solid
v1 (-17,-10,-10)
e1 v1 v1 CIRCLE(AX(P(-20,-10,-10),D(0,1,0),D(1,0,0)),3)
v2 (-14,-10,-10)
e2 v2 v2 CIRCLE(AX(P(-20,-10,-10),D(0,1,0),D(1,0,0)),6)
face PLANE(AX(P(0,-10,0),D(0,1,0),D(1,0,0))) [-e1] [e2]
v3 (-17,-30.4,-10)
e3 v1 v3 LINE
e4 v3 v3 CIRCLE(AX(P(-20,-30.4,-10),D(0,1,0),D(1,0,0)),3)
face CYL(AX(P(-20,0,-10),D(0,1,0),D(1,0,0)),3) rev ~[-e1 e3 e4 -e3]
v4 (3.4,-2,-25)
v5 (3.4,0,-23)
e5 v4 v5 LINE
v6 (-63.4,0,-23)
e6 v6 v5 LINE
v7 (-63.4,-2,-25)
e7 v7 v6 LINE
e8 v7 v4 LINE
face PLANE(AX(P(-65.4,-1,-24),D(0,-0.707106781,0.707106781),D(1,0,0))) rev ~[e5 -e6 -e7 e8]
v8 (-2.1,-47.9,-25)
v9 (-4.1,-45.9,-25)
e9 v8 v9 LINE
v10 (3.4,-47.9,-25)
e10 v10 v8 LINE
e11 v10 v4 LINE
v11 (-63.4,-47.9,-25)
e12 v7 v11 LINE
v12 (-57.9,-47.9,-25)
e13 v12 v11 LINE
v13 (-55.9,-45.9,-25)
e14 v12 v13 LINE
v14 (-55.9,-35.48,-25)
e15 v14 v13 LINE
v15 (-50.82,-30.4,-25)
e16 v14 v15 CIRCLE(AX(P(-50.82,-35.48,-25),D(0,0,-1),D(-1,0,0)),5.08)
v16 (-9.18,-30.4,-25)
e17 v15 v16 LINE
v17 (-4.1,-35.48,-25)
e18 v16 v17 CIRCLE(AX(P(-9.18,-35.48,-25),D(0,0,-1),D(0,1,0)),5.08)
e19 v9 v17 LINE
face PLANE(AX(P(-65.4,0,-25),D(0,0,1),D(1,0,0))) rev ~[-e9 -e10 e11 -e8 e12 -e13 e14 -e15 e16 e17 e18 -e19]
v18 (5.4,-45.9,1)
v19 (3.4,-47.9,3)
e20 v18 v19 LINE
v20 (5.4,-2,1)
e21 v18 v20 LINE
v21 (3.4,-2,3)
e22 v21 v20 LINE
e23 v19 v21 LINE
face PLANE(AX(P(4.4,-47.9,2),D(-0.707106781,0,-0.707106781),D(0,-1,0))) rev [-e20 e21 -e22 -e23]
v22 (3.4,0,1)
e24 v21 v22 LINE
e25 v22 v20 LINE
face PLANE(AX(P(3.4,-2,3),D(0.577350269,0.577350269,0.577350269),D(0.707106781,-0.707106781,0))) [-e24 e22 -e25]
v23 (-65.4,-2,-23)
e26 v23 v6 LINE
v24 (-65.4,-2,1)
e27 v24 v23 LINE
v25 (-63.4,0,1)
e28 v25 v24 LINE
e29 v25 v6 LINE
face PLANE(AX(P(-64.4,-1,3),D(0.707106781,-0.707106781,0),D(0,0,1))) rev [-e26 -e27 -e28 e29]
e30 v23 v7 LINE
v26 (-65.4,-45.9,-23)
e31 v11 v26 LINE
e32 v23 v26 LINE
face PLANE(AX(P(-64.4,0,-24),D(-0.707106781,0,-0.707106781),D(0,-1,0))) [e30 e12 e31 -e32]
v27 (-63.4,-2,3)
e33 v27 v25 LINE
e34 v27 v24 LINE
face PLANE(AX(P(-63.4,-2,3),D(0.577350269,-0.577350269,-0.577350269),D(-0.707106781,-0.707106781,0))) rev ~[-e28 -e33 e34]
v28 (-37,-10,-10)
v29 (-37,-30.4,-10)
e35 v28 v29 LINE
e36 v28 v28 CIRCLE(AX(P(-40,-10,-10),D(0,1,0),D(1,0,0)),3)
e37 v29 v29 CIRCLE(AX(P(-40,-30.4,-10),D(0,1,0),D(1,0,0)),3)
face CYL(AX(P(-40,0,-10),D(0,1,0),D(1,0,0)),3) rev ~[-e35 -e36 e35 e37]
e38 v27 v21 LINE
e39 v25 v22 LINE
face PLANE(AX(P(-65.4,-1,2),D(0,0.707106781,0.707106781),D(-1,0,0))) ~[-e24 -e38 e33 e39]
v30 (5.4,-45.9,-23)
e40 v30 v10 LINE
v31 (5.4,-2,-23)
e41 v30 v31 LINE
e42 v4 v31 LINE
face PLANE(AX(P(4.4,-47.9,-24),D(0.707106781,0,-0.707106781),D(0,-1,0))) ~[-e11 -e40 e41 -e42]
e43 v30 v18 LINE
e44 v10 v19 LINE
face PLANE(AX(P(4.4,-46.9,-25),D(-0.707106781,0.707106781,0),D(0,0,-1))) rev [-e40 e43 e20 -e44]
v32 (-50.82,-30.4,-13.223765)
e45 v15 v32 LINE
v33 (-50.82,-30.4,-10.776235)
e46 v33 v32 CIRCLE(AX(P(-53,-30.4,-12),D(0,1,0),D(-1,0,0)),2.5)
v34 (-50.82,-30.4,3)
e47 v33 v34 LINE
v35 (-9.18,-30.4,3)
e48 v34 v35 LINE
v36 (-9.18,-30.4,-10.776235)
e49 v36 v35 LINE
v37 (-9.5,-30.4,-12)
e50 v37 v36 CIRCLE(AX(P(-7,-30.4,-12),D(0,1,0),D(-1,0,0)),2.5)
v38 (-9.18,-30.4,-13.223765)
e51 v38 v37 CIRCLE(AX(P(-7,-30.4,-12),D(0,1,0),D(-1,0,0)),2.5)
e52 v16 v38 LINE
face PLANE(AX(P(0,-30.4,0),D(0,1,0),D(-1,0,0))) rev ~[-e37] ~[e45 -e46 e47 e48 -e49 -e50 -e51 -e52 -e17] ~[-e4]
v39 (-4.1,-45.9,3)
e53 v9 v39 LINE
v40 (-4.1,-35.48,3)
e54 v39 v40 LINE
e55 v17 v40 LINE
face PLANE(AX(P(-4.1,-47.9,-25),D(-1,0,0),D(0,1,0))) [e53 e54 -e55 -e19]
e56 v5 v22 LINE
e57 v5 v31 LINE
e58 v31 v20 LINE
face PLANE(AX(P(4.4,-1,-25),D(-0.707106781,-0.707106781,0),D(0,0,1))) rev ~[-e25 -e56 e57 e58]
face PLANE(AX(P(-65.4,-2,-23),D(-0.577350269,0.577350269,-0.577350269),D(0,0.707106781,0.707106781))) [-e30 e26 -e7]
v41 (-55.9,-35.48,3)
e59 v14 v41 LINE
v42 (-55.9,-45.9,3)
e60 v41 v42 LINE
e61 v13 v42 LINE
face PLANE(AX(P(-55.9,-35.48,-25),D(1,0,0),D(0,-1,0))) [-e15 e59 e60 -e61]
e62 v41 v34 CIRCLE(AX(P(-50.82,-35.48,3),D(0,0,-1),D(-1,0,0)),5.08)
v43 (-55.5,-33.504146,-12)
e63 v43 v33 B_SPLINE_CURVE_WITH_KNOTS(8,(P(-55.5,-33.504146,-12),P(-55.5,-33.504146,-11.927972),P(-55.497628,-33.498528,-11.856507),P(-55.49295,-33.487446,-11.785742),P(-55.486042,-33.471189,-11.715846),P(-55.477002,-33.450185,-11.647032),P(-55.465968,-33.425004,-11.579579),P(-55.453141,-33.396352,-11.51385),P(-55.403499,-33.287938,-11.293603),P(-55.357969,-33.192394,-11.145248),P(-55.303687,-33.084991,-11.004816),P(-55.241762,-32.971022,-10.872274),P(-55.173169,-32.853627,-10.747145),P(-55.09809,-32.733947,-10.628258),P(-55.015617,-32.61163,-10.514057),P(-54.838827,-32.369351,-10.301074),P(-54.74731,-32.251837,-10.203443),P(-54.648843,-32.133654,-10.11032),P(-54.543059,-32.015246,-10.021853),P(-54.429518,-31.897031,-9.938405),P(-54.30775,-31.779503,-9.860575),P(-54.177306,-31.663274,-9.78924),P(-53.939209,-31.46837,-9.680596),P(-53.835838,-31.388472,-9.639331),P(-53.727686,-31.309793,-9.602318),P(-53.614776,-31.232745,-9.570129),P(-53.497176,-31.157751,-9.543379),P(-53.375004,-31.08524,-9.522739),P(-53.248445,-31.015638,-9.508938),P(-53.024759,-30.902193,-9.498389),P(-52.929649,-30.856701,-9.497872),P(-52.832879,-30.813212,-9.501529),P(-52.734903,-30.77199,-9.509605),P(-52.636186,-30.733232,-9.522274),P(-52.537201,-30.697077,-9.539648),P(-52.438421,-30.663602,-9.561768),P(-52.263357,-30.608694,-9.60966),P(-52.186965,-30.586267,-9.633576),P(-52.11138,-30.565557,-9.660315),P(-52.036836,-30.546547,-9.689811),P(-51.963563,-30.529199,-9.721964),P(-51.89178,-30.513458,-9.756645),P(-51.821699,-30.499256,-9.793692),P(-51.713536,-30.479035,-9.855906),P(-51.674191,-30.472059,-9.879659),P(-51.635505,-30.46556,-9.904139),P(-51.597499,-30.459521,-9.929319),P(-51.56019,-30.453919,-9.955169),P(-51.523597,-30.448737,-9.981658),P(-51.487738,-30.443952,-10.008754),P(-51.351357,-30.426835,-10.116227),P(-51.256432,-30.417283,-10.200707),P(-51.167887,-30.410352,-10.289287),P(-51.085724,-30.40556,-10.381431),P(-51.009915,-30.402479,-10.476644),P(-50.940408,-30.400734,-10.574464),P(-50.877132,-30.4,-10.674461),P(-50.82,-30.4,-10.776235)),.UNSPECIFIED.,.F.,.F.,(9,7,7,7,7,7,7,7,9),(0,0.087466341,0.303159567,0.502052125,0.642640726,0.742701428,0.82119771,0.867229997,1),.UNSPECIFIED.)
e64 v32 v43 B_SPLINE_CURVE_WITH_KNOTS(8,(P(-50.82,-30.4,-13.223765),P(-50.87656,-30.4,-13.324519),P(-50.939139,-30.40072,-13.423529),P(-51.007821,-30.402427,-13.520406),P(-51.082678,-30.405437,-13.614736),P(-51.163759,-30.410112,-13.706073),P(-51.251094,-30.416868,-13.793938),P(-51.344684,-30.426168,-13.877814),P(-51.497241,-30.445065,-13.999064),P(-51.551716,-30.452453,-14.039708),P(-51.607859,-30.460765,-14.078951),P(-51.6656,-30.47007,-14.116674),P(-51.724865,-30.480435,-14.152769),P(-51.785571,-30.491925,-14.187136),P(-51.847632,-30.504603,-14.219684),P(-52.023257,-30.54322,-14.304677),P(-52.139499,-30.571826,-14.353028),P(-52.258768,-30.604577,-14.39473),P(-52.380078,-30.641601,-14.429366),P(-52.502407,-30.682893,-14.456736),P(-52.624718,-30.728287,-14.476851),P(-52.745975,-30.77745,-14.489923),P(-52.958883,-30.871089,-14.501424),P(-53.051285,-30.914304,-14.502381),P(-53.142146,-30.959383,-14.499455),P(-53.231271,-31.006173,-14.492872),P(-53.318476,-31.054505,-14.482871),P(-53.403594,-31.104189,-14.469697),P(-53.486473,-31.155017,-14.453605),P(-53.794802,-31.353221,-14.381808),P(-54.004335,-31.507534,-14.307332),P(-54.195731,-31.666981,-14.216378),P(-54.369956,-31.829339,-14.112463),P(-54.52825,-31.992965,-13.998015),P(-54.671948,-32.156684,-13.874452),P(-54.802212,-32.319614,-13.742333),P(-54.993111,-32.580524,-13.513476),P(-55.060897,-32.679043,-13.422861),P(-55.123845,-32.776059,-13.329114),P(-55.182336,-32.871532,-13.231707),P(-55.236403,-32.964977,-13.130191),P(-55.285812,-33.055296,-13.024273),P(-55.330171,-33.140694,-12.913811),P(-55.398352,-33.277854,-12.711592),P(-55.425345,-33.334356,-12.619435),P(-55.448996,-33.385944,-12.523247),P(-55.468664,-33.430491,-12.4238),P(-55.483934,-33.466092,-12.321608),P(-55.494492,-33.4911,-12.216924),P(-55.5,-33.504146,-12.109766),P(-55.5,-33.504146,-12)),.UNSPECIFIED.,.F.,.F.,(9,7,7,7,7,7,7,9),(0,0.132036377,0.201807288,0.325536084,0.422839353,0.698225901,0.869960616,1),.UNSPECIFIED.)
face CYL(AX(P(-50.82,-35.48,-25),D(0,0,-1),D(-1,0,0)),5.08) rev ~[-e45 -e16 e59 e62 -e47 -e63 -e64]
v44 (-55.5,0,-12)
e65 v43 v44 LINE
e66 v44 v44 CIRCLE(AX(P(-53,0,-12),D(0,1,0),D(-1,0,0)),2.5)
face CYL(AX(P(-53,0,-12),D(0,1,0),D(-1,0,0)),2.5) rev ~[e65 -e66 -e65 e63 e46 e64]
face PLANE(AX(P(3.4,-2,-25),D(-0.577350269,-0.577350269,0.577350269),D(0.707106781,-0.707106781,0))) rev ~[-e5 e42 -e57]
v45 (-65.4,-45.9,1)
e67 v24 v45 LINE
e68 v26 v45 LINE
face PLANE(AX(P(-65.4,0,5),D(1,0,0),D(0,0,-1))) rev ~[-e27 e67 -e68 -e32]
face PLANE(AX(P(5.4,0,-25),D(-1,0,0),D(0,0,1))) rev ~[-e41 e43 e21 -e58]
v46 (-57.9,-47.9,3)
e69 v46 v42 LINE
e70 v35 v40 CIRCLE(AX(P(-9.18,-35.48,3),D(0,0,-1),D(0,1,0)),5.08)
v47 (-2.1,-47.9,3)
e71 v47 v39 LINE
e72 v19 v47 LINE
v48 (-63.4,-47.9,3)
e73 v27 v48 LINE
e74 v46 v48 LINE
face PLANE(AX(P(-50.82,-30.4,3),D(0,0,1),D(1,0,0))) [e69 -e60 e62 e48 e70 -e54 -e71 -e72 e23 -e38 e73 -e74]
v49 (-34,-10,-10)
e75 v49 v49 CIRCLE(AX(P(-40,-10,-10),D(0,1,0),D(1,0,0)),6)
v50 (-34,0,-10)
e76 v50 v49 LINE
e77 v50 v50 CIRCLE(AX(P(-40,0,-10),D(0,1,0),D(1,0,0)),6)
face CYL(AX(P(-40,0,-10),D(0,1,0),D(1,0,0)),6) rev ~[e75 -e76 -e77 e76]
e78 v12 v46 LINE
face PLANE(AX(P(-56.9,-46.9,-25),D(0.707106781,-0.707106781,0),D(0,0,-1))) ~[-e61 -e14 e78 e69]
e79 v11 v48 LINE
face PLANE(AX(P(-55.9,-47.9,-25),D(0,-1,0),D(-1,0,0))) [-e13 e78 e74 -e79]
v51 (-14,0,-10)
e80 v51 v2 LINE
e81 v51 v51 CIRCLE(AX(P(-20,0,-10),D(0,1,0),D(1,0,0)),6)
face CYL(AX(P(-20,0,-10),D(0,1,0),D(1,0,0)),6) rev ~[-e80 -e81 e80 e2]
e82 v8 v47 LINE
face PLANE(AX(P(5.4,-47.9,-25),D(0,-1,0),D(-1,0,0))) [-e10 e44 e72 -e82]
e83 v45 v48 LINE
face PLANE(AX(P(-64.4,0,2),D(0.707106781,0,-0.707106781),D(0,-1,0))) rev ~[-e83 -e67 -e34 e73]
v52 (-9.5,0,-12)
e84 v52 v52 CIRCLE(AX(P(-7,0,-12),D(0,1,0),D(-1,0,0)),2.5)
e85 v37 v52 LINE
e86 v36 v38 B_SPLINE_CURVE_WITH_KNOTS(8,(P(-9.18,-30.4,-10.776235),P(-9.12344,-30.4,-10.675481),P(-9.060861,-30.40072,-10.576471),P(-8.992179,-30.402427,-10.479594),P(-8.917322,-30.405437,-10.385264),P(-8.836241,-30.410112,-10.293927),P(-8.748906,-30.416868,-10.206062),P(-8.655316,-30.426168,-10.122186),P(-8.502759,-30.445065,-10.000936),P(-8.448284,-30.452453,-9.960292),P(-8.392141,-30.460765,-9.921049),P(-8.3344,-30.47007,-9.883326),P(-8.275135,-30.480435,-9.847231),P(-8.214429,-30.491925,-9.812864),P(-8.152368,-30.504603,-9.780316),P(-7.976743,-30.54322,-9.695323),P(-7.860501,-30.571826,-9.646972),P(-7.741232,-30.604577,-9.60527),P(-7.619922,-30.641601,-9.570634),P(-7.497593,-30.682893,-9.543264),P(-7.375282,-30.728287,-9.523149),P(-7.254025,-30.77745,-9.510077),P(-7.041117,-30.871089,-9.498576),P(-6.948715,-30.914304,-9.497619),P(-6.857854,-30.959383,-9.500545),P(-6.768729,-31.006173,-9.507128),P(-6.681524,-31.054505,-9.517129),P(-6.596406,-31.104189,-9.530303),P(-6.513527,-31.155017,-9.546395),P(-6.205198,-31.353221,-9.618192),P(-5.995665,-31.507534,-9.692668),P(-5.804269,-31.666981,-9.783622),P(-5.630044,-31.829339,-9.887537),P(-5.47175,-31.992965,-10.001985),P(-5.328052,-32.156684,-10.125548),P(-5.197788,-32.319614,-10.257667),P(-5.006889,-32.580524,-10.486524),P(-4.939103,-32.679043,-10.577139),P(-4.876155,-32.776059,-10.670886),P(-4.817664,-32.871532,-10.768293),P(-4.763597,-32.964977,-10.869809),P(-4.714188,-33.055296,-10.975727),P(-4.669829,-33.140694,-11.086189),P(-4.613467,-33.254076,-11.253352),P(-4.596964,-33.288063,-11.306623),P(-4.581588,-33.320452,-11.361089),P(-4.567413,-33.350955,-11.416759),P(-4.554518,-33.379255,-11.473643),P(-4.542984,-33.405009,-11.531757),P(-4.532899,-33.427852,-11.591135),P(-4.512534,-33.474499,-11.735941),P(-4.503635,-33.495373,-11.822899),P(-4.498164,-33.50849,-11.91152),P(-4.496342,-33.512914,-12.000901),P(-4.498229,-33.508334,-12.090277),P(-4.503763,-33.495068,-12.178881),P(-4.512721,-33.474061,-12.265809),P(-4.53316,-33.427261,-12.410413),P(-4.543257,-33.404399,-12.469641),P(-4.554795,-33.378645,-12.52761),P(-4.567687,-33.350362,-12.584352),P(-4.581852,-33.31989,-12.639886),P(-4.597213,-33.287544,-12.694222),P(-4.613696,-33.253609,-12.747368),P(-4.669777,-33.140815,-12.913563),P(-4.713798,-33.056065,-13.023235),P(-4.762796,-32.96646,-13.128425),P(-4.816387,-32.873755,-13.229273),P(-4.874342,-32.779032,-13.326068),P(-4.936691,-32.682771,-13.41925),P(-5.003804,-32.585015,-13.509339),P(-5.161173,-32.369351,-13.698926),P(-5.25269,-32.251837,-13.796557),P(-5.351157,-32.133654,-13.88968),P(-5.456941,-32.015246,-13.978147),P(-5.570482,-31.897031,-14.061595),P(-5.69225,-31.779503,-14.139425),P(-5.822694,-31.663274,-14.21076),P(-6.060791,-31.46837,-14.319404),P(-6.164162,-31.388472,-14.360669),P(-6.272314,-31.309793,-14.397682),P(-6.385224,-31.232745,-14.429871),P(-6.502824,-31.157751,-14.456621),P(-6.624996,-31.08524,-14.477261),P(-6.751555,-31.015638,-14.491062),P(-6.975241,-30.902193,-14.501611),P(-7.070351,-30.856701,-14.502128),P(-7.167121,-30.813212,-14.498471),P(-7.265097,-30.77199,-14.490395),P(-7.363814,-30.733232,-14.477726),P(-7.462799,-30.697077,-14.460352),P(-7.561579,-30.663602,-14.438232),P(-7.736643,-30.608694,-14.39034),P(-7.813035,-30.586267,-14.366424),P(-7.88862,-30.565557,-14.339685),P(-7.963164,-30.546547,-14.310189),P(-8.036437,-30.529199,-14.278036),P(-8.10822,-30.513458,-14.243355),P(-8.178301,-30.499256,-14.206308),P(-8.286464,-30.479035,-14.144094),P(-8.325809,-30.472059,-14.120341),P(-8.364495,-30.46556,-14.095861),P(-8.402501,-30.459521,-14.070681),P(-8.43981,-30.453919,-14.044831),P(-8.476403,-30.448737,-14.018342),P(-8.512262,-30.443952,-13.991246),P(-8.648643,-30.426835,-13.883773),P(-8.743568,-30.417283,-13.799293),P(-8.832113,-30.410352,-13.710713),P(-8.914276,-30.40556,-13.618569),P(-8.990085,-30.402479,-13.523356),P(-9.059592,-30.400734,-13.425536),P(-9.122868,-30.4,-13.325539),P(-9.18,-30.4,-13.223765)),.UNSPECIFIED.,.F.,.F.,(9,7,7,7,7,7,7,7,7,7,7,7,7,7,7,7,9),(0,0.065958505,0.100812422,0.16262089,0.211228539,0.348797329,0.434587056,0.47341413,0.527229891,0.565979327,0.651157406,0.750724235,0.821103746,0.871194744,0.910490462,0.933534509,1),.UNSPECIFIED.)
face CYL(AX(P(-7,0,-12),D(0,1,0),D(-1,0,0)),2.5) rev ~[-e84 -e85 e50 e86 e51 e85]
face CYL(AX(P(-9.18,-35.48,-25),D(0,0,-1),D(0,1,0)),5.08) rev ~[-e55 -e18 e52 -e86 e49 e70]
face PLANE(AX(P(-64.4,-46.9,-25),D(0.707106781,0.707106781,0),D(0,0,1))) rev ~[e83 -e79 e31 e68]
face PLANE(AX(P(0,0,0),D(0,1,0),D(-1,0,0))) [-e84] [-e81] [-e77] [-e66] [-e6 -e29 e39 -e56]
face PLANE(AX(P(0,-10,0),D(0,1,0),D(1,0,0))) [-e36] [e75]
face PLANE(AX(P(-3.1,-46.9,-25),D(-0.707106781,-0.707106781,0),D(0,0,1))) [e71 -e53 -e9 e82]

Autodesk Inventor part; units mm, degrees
ref_plane "YZ Plane" through (0, 0, 0) normal (1, 0, 0) x (0, 1, 0)
ref_plane "XZ Plane" through (0, 0, 0) normal (0, 1, 0) x (-1, 0, 0)
sketch "Sketch1" plane through (0, 0, 0) normal (0, 1, 0) x (-1, 0, 0)
  line L0 (0, 0) -> (60, 0) construction
  line L1 (60, 0) -> (60, -20) construction
  line L2 (60, -20) -> (0, -20) construction
  line L3 (0, -20) -> (0, 0) construction
  line L4 (60.5, 0.5) -> (-0.5, 0.5)
  line L5 (-0.5, 0.5) -> (-0.5, -20.5)
  line L6 (-0.5, -20.5) -> (60.5, -20.5)
  line L7 (60.5, -20.5) -> (60.5, 0.5)
  circle A0 centre (53, -12) radius 2.5
  circle A1 centre (7, -12) radius 2.5
  line L8 (53, -12) -> (7, -12) construction
  point P0 (30, -12)
  point P1 (30, -20)
  point P2 (0, -10)
  point P3 (-0.5, -10)
  dimension "d0" = 20
  dimension "d1" = 60
  dimension "d2" = 0.5
  dimension "d3" = 0.5
  dimension "d4" = 0.5
  dimension "d5" = 0.5
  dimension "d6" = 5
  dimension "d7" = 46
  dimension "d109" = 2
sketch "Sketch2" plane through (0, 0, 0) normal (0, 1, 0) x (-1, 0, 0)
  line L0 (-5.4, 5) -> (65.4, 5)
  line L1 (65.4, 5) -> (65.4, -25)
  line L2 (65.4, -25) -> (-5.4, -25)
  line L3 (-5.4, -25) -> (-5.4, 5)
  line L4 (60.5, -20.5) -> (60.5, 0.5) construction
  line L5 (-0.5, 0.5) -> (-0.5, -20.5) construction
  line L6 (-0.5, -20.5) -> (60.5, -20.5) construction
  point P0 (0, 0)
  point P1 (60.5, -10)
  point P2 (65.4, -10)
  point P3 (30, -20.5)
  point P4 (30, -25)
  dimension "d9" = 70.8
  dimension "d10" = 30
  dimension "d44" = 35.4
extrude "Extrusion1" add sketch "Sketch2" against normal blind 30.4
extrude "Extrusion3" cut sketch "Sketch1" against normal blind 43.3375 and the other way blind 30.4 contours A0 | A1
sketch "Sketch3" plane through (5.4, -30.4, -25) normal (0, 0, -1) x (1, 0, 0)
  line L0 (-70.8, 0) -> (0, 0) projected
  line L1 (0, 0) -> (0, 17.5)
  line L2 (0, 17.5) -> (-9.5, 17.5)
  line L3 (-9.5, 17.5) -> (-9.5, 5.08)
  line L4 (-14.58, 0) -> (-56.22, 0)
  line L5 (-61.3, 5.08) -> (-61.3, 17.5)
  line L6 (-61.3, 17.5) -> (-70.8, 17.5)
  line L7 (-70.8, 17.5) -> (-70.8, 0)
  arc A0 (-14.58, 0) -> (-9.5, 5.08) centre (-14.58, 5.08) ccw
  arc A1 (-61.3, 5.08) -> (-56.22, 0) centre (-56.22, 5.08) ccw
  point P0 (-9.5, 0)
  point P1 (-61.3, 0)
  point P2 (-61.3, 11.29)
  point P3 (-9.5, 11.29)
  point P4 (-4.75, 17.5)
  dimension "d94" = 51.8
  dimension "d95" = 17.5
  dimension "d96" = 5.08
extrude "Extrusion4" add sketch "Sketch3" against normal up to surface (30 mm away)
ref_plane "Work Plane3" through (-49.05, -33.575, -1214.2) normal (0, -1, 0) x (1, 0, 0)
sketch "Sketch4" plane through (0, 0, 0) normal (0, 1, 0) x (1, 0, 0)
  line L0 (-60.5, 20.5) -> (0.5, 20.5) construction
  line L1 (-60.5, -0.5) -> (-60.5, 20.5) construction
  circle A0 centre (-40, 10) radius 3
  line L2 (5.4, 25) -> (-65.4, 25) projected
  line L3 (-65.4, 25) -> (-65.4, -5) projected
  circle A1 centre (-20, 10) radius 3
  line L4 (-40, 10) -> (-20, 10) construction
  point P0 (0, 0)
  point P1 (-30, 20.5)
  point P2 (-60.5, 10)
  point P3 (-65.4, 20.5)
  point P4 (5.4, 20.5)
  point P5 (-30, 20.5)
  point P6 (-60.5, 10)
  point P7 (-65.4, 10)
  point P8 (-30, 25)
  point P9 (-30, 10)
  dimension "d82" = 6
  dimension "d98" = 20
  dimension "d107" = 0
extrude "Extrusion5" cut sketch "Sketch4" against normal up to surface (33.575 mm away)
extrude "Extrusion2" cut sketch "Sketch1" against normal blind 43.3375 and the other way blind 5 contours A0 | A1
sketch "Sketch8" plane through (15.4, 40, -25) normal (0, 0, -1) x (1, 0, 0)
  line L0 (25.4, 30) -> (34.4, 30)
  line L1 (34.4, 30) -> (35.4, 31)
  line L2 (35.4, 31) -> (35.4, 34)
  line L3 (35.4, 34) -> (31.95, 37.45)
  line L4 (31.95, 37.45) -> (31.95, 39.8767)
  line L5 (31.95, 39.8767) -> (33.1672, 41.0939)
  arc A0 (34.8792, 42.8058) -> (33.1672, 41.0939) centre (35.1489, 40.8241) ccw
  line L6 (34.8792, 42.8058) -> (35.4, 43.3267)
  line L7 (35.4, 43.3267) -> (35.4, 44.66)
  line L8 (35.4, 44.66) -> (34.8792, 45.1808)
  arc A1 (33.1672, 46.8928) -> (34.8792, 45.1808) centre (35.1489, 47.1626) ccw
  line L9 (33.1672, 46.8928) -> (32.56, 47.5)
  line L10 (32.56, 47.5) -> (25.4, 47.5)
  line L11 (25.4, 47.5) -> (25.4, 30) construction
  line L12 (33.1672, 41.0939) -> (34.8792, 42.8058) construction
  line L13 (33.1672, 46.8928) -> (34.8792, 45.1808) construction
  line L14 (25.4, 30) -> (16.4, 30)
  line L15 (16.4, 30) -> (15.4, 31)
  line L16 (15.4, 31) -> (15.4, 34)
  line L17 (15.4, 34) -> (18.85, 37.45)
  line L18 (18.85, 37.45) -> (18.85, 39.8767)
  line L19 (18.85, 39.8767) -> (17.6328, 41.0939)
  arc A2 (17.6328, 41.0939) -> (15.9208, 42.8058) centre (15.6511, 40.8241) ccw
  line L20 (15.9208, 42.8058) -> (15.4, 43.3267)
  line L21 (15.4, 43.3267) -> (15.4, 44.66)
  line L22 (15.4, 44.66) -> (15.9208, 45.1808)
  arc A3 (15.9208, 45.1808) -> (17.6328, 46.8928) centre (15.6511, 47.1626) ccw
  line L23 (17.6328, 46.8928) -> (18.24, 47.5)
  line L24 (18.24, 47.5) -> (25.4, 47.5)
  line L25 (17.6328, 41.0939) -> (15.9208, 42.8058) construction
  line L26 (17.6328, 46.8928) -> (15.9208, 45.1808) construction
  arc A4 (50.8, 26.825) -> (47.625, 30) centre (47.625, 26.825) ccw construction
  line L27 (34.4, 30) -> (35.4, 30)
  line L28 (3.175, 30) -> (47.625, 30) projected
  line L29 (35.4, 31) -> (35.4, 30)
  line L30 (15.4, 31) -> (15.4, 30)
  line L31 (15.4, 30) -> (16.4, 30)
  point P0 (-15.4, 40)
  point P1 (35.4, 32.5)
  dimension "d64" = 1
  dimension "d65" = 3
  dimension "d66" = 135
  dimension "d67" = 2
  dimension "d69" = 3.45
  dimension "d71" = 17.5
  dimension "d72" = 7.16
  dimension "d73" = 2.375
  dimension "d74" = 1.3333
  dimension "d75" = 2.4211
  dimension "d76" = 15.4
  dimension "d77" = 10
extrude "Extrusion8" [suppressed]
thicken "Thicken1" [suppressed]
sketch "Sketch11" plane through (0, 0, 0) normal (0, 1, 0) x (1, 0, 0)
  circle A0 centre (-20, 10) radius 6
  circle A1 centre (-40, 10) radius 3 projected
  circle A2 centre (-20, 10) radius 3 projected
  circle A3 centre (-40, 10) radius 6
  point P0 (0, 0)
  dimension "d99" = 12
extrude "Extrusion11" cut sketch "Sketch11" against normal blind 10 contours A0 | A1 | A2 | A3
sketch "Sketch12" plane through (-50.82, -30.4, 5) normal (0, 0, 1) x (1, 0, 0)
  line L0 (-31.8767, 47.5596) -> (80.4706, 47.5596)
  line L1 (80.4706, 47.5596) -> (80.4706, -43.9783)
  line L2 (80.4706, -43.9783) -> (-31.8767, -43.9783)
  line L3 (-31.8767, -43.9783) -> (-31.8767, 47.5596)
  point P0 (50.82, 30.4)
extrude "Extrusion12" cut sketch "Sketch12" against normal blind 2
chamfer "Chamfer1" distance 2 angle 45 12 edges at (5.4, 0, -11) (-30, 0, -25) (5.4, -23.95, -25) (-65.4, -23.95, -25) (-55.9, -47.9, -11) (5.4, -47.9, -11) (-65.4, 0, -11) (-65.4, -47.9, -11) (-4.1, -47.9, -11) (-30, 0, 3) (-65.4, -23.95, 3) (5.4, -23.95, 3)
properties part number "BK12_Spacer"
